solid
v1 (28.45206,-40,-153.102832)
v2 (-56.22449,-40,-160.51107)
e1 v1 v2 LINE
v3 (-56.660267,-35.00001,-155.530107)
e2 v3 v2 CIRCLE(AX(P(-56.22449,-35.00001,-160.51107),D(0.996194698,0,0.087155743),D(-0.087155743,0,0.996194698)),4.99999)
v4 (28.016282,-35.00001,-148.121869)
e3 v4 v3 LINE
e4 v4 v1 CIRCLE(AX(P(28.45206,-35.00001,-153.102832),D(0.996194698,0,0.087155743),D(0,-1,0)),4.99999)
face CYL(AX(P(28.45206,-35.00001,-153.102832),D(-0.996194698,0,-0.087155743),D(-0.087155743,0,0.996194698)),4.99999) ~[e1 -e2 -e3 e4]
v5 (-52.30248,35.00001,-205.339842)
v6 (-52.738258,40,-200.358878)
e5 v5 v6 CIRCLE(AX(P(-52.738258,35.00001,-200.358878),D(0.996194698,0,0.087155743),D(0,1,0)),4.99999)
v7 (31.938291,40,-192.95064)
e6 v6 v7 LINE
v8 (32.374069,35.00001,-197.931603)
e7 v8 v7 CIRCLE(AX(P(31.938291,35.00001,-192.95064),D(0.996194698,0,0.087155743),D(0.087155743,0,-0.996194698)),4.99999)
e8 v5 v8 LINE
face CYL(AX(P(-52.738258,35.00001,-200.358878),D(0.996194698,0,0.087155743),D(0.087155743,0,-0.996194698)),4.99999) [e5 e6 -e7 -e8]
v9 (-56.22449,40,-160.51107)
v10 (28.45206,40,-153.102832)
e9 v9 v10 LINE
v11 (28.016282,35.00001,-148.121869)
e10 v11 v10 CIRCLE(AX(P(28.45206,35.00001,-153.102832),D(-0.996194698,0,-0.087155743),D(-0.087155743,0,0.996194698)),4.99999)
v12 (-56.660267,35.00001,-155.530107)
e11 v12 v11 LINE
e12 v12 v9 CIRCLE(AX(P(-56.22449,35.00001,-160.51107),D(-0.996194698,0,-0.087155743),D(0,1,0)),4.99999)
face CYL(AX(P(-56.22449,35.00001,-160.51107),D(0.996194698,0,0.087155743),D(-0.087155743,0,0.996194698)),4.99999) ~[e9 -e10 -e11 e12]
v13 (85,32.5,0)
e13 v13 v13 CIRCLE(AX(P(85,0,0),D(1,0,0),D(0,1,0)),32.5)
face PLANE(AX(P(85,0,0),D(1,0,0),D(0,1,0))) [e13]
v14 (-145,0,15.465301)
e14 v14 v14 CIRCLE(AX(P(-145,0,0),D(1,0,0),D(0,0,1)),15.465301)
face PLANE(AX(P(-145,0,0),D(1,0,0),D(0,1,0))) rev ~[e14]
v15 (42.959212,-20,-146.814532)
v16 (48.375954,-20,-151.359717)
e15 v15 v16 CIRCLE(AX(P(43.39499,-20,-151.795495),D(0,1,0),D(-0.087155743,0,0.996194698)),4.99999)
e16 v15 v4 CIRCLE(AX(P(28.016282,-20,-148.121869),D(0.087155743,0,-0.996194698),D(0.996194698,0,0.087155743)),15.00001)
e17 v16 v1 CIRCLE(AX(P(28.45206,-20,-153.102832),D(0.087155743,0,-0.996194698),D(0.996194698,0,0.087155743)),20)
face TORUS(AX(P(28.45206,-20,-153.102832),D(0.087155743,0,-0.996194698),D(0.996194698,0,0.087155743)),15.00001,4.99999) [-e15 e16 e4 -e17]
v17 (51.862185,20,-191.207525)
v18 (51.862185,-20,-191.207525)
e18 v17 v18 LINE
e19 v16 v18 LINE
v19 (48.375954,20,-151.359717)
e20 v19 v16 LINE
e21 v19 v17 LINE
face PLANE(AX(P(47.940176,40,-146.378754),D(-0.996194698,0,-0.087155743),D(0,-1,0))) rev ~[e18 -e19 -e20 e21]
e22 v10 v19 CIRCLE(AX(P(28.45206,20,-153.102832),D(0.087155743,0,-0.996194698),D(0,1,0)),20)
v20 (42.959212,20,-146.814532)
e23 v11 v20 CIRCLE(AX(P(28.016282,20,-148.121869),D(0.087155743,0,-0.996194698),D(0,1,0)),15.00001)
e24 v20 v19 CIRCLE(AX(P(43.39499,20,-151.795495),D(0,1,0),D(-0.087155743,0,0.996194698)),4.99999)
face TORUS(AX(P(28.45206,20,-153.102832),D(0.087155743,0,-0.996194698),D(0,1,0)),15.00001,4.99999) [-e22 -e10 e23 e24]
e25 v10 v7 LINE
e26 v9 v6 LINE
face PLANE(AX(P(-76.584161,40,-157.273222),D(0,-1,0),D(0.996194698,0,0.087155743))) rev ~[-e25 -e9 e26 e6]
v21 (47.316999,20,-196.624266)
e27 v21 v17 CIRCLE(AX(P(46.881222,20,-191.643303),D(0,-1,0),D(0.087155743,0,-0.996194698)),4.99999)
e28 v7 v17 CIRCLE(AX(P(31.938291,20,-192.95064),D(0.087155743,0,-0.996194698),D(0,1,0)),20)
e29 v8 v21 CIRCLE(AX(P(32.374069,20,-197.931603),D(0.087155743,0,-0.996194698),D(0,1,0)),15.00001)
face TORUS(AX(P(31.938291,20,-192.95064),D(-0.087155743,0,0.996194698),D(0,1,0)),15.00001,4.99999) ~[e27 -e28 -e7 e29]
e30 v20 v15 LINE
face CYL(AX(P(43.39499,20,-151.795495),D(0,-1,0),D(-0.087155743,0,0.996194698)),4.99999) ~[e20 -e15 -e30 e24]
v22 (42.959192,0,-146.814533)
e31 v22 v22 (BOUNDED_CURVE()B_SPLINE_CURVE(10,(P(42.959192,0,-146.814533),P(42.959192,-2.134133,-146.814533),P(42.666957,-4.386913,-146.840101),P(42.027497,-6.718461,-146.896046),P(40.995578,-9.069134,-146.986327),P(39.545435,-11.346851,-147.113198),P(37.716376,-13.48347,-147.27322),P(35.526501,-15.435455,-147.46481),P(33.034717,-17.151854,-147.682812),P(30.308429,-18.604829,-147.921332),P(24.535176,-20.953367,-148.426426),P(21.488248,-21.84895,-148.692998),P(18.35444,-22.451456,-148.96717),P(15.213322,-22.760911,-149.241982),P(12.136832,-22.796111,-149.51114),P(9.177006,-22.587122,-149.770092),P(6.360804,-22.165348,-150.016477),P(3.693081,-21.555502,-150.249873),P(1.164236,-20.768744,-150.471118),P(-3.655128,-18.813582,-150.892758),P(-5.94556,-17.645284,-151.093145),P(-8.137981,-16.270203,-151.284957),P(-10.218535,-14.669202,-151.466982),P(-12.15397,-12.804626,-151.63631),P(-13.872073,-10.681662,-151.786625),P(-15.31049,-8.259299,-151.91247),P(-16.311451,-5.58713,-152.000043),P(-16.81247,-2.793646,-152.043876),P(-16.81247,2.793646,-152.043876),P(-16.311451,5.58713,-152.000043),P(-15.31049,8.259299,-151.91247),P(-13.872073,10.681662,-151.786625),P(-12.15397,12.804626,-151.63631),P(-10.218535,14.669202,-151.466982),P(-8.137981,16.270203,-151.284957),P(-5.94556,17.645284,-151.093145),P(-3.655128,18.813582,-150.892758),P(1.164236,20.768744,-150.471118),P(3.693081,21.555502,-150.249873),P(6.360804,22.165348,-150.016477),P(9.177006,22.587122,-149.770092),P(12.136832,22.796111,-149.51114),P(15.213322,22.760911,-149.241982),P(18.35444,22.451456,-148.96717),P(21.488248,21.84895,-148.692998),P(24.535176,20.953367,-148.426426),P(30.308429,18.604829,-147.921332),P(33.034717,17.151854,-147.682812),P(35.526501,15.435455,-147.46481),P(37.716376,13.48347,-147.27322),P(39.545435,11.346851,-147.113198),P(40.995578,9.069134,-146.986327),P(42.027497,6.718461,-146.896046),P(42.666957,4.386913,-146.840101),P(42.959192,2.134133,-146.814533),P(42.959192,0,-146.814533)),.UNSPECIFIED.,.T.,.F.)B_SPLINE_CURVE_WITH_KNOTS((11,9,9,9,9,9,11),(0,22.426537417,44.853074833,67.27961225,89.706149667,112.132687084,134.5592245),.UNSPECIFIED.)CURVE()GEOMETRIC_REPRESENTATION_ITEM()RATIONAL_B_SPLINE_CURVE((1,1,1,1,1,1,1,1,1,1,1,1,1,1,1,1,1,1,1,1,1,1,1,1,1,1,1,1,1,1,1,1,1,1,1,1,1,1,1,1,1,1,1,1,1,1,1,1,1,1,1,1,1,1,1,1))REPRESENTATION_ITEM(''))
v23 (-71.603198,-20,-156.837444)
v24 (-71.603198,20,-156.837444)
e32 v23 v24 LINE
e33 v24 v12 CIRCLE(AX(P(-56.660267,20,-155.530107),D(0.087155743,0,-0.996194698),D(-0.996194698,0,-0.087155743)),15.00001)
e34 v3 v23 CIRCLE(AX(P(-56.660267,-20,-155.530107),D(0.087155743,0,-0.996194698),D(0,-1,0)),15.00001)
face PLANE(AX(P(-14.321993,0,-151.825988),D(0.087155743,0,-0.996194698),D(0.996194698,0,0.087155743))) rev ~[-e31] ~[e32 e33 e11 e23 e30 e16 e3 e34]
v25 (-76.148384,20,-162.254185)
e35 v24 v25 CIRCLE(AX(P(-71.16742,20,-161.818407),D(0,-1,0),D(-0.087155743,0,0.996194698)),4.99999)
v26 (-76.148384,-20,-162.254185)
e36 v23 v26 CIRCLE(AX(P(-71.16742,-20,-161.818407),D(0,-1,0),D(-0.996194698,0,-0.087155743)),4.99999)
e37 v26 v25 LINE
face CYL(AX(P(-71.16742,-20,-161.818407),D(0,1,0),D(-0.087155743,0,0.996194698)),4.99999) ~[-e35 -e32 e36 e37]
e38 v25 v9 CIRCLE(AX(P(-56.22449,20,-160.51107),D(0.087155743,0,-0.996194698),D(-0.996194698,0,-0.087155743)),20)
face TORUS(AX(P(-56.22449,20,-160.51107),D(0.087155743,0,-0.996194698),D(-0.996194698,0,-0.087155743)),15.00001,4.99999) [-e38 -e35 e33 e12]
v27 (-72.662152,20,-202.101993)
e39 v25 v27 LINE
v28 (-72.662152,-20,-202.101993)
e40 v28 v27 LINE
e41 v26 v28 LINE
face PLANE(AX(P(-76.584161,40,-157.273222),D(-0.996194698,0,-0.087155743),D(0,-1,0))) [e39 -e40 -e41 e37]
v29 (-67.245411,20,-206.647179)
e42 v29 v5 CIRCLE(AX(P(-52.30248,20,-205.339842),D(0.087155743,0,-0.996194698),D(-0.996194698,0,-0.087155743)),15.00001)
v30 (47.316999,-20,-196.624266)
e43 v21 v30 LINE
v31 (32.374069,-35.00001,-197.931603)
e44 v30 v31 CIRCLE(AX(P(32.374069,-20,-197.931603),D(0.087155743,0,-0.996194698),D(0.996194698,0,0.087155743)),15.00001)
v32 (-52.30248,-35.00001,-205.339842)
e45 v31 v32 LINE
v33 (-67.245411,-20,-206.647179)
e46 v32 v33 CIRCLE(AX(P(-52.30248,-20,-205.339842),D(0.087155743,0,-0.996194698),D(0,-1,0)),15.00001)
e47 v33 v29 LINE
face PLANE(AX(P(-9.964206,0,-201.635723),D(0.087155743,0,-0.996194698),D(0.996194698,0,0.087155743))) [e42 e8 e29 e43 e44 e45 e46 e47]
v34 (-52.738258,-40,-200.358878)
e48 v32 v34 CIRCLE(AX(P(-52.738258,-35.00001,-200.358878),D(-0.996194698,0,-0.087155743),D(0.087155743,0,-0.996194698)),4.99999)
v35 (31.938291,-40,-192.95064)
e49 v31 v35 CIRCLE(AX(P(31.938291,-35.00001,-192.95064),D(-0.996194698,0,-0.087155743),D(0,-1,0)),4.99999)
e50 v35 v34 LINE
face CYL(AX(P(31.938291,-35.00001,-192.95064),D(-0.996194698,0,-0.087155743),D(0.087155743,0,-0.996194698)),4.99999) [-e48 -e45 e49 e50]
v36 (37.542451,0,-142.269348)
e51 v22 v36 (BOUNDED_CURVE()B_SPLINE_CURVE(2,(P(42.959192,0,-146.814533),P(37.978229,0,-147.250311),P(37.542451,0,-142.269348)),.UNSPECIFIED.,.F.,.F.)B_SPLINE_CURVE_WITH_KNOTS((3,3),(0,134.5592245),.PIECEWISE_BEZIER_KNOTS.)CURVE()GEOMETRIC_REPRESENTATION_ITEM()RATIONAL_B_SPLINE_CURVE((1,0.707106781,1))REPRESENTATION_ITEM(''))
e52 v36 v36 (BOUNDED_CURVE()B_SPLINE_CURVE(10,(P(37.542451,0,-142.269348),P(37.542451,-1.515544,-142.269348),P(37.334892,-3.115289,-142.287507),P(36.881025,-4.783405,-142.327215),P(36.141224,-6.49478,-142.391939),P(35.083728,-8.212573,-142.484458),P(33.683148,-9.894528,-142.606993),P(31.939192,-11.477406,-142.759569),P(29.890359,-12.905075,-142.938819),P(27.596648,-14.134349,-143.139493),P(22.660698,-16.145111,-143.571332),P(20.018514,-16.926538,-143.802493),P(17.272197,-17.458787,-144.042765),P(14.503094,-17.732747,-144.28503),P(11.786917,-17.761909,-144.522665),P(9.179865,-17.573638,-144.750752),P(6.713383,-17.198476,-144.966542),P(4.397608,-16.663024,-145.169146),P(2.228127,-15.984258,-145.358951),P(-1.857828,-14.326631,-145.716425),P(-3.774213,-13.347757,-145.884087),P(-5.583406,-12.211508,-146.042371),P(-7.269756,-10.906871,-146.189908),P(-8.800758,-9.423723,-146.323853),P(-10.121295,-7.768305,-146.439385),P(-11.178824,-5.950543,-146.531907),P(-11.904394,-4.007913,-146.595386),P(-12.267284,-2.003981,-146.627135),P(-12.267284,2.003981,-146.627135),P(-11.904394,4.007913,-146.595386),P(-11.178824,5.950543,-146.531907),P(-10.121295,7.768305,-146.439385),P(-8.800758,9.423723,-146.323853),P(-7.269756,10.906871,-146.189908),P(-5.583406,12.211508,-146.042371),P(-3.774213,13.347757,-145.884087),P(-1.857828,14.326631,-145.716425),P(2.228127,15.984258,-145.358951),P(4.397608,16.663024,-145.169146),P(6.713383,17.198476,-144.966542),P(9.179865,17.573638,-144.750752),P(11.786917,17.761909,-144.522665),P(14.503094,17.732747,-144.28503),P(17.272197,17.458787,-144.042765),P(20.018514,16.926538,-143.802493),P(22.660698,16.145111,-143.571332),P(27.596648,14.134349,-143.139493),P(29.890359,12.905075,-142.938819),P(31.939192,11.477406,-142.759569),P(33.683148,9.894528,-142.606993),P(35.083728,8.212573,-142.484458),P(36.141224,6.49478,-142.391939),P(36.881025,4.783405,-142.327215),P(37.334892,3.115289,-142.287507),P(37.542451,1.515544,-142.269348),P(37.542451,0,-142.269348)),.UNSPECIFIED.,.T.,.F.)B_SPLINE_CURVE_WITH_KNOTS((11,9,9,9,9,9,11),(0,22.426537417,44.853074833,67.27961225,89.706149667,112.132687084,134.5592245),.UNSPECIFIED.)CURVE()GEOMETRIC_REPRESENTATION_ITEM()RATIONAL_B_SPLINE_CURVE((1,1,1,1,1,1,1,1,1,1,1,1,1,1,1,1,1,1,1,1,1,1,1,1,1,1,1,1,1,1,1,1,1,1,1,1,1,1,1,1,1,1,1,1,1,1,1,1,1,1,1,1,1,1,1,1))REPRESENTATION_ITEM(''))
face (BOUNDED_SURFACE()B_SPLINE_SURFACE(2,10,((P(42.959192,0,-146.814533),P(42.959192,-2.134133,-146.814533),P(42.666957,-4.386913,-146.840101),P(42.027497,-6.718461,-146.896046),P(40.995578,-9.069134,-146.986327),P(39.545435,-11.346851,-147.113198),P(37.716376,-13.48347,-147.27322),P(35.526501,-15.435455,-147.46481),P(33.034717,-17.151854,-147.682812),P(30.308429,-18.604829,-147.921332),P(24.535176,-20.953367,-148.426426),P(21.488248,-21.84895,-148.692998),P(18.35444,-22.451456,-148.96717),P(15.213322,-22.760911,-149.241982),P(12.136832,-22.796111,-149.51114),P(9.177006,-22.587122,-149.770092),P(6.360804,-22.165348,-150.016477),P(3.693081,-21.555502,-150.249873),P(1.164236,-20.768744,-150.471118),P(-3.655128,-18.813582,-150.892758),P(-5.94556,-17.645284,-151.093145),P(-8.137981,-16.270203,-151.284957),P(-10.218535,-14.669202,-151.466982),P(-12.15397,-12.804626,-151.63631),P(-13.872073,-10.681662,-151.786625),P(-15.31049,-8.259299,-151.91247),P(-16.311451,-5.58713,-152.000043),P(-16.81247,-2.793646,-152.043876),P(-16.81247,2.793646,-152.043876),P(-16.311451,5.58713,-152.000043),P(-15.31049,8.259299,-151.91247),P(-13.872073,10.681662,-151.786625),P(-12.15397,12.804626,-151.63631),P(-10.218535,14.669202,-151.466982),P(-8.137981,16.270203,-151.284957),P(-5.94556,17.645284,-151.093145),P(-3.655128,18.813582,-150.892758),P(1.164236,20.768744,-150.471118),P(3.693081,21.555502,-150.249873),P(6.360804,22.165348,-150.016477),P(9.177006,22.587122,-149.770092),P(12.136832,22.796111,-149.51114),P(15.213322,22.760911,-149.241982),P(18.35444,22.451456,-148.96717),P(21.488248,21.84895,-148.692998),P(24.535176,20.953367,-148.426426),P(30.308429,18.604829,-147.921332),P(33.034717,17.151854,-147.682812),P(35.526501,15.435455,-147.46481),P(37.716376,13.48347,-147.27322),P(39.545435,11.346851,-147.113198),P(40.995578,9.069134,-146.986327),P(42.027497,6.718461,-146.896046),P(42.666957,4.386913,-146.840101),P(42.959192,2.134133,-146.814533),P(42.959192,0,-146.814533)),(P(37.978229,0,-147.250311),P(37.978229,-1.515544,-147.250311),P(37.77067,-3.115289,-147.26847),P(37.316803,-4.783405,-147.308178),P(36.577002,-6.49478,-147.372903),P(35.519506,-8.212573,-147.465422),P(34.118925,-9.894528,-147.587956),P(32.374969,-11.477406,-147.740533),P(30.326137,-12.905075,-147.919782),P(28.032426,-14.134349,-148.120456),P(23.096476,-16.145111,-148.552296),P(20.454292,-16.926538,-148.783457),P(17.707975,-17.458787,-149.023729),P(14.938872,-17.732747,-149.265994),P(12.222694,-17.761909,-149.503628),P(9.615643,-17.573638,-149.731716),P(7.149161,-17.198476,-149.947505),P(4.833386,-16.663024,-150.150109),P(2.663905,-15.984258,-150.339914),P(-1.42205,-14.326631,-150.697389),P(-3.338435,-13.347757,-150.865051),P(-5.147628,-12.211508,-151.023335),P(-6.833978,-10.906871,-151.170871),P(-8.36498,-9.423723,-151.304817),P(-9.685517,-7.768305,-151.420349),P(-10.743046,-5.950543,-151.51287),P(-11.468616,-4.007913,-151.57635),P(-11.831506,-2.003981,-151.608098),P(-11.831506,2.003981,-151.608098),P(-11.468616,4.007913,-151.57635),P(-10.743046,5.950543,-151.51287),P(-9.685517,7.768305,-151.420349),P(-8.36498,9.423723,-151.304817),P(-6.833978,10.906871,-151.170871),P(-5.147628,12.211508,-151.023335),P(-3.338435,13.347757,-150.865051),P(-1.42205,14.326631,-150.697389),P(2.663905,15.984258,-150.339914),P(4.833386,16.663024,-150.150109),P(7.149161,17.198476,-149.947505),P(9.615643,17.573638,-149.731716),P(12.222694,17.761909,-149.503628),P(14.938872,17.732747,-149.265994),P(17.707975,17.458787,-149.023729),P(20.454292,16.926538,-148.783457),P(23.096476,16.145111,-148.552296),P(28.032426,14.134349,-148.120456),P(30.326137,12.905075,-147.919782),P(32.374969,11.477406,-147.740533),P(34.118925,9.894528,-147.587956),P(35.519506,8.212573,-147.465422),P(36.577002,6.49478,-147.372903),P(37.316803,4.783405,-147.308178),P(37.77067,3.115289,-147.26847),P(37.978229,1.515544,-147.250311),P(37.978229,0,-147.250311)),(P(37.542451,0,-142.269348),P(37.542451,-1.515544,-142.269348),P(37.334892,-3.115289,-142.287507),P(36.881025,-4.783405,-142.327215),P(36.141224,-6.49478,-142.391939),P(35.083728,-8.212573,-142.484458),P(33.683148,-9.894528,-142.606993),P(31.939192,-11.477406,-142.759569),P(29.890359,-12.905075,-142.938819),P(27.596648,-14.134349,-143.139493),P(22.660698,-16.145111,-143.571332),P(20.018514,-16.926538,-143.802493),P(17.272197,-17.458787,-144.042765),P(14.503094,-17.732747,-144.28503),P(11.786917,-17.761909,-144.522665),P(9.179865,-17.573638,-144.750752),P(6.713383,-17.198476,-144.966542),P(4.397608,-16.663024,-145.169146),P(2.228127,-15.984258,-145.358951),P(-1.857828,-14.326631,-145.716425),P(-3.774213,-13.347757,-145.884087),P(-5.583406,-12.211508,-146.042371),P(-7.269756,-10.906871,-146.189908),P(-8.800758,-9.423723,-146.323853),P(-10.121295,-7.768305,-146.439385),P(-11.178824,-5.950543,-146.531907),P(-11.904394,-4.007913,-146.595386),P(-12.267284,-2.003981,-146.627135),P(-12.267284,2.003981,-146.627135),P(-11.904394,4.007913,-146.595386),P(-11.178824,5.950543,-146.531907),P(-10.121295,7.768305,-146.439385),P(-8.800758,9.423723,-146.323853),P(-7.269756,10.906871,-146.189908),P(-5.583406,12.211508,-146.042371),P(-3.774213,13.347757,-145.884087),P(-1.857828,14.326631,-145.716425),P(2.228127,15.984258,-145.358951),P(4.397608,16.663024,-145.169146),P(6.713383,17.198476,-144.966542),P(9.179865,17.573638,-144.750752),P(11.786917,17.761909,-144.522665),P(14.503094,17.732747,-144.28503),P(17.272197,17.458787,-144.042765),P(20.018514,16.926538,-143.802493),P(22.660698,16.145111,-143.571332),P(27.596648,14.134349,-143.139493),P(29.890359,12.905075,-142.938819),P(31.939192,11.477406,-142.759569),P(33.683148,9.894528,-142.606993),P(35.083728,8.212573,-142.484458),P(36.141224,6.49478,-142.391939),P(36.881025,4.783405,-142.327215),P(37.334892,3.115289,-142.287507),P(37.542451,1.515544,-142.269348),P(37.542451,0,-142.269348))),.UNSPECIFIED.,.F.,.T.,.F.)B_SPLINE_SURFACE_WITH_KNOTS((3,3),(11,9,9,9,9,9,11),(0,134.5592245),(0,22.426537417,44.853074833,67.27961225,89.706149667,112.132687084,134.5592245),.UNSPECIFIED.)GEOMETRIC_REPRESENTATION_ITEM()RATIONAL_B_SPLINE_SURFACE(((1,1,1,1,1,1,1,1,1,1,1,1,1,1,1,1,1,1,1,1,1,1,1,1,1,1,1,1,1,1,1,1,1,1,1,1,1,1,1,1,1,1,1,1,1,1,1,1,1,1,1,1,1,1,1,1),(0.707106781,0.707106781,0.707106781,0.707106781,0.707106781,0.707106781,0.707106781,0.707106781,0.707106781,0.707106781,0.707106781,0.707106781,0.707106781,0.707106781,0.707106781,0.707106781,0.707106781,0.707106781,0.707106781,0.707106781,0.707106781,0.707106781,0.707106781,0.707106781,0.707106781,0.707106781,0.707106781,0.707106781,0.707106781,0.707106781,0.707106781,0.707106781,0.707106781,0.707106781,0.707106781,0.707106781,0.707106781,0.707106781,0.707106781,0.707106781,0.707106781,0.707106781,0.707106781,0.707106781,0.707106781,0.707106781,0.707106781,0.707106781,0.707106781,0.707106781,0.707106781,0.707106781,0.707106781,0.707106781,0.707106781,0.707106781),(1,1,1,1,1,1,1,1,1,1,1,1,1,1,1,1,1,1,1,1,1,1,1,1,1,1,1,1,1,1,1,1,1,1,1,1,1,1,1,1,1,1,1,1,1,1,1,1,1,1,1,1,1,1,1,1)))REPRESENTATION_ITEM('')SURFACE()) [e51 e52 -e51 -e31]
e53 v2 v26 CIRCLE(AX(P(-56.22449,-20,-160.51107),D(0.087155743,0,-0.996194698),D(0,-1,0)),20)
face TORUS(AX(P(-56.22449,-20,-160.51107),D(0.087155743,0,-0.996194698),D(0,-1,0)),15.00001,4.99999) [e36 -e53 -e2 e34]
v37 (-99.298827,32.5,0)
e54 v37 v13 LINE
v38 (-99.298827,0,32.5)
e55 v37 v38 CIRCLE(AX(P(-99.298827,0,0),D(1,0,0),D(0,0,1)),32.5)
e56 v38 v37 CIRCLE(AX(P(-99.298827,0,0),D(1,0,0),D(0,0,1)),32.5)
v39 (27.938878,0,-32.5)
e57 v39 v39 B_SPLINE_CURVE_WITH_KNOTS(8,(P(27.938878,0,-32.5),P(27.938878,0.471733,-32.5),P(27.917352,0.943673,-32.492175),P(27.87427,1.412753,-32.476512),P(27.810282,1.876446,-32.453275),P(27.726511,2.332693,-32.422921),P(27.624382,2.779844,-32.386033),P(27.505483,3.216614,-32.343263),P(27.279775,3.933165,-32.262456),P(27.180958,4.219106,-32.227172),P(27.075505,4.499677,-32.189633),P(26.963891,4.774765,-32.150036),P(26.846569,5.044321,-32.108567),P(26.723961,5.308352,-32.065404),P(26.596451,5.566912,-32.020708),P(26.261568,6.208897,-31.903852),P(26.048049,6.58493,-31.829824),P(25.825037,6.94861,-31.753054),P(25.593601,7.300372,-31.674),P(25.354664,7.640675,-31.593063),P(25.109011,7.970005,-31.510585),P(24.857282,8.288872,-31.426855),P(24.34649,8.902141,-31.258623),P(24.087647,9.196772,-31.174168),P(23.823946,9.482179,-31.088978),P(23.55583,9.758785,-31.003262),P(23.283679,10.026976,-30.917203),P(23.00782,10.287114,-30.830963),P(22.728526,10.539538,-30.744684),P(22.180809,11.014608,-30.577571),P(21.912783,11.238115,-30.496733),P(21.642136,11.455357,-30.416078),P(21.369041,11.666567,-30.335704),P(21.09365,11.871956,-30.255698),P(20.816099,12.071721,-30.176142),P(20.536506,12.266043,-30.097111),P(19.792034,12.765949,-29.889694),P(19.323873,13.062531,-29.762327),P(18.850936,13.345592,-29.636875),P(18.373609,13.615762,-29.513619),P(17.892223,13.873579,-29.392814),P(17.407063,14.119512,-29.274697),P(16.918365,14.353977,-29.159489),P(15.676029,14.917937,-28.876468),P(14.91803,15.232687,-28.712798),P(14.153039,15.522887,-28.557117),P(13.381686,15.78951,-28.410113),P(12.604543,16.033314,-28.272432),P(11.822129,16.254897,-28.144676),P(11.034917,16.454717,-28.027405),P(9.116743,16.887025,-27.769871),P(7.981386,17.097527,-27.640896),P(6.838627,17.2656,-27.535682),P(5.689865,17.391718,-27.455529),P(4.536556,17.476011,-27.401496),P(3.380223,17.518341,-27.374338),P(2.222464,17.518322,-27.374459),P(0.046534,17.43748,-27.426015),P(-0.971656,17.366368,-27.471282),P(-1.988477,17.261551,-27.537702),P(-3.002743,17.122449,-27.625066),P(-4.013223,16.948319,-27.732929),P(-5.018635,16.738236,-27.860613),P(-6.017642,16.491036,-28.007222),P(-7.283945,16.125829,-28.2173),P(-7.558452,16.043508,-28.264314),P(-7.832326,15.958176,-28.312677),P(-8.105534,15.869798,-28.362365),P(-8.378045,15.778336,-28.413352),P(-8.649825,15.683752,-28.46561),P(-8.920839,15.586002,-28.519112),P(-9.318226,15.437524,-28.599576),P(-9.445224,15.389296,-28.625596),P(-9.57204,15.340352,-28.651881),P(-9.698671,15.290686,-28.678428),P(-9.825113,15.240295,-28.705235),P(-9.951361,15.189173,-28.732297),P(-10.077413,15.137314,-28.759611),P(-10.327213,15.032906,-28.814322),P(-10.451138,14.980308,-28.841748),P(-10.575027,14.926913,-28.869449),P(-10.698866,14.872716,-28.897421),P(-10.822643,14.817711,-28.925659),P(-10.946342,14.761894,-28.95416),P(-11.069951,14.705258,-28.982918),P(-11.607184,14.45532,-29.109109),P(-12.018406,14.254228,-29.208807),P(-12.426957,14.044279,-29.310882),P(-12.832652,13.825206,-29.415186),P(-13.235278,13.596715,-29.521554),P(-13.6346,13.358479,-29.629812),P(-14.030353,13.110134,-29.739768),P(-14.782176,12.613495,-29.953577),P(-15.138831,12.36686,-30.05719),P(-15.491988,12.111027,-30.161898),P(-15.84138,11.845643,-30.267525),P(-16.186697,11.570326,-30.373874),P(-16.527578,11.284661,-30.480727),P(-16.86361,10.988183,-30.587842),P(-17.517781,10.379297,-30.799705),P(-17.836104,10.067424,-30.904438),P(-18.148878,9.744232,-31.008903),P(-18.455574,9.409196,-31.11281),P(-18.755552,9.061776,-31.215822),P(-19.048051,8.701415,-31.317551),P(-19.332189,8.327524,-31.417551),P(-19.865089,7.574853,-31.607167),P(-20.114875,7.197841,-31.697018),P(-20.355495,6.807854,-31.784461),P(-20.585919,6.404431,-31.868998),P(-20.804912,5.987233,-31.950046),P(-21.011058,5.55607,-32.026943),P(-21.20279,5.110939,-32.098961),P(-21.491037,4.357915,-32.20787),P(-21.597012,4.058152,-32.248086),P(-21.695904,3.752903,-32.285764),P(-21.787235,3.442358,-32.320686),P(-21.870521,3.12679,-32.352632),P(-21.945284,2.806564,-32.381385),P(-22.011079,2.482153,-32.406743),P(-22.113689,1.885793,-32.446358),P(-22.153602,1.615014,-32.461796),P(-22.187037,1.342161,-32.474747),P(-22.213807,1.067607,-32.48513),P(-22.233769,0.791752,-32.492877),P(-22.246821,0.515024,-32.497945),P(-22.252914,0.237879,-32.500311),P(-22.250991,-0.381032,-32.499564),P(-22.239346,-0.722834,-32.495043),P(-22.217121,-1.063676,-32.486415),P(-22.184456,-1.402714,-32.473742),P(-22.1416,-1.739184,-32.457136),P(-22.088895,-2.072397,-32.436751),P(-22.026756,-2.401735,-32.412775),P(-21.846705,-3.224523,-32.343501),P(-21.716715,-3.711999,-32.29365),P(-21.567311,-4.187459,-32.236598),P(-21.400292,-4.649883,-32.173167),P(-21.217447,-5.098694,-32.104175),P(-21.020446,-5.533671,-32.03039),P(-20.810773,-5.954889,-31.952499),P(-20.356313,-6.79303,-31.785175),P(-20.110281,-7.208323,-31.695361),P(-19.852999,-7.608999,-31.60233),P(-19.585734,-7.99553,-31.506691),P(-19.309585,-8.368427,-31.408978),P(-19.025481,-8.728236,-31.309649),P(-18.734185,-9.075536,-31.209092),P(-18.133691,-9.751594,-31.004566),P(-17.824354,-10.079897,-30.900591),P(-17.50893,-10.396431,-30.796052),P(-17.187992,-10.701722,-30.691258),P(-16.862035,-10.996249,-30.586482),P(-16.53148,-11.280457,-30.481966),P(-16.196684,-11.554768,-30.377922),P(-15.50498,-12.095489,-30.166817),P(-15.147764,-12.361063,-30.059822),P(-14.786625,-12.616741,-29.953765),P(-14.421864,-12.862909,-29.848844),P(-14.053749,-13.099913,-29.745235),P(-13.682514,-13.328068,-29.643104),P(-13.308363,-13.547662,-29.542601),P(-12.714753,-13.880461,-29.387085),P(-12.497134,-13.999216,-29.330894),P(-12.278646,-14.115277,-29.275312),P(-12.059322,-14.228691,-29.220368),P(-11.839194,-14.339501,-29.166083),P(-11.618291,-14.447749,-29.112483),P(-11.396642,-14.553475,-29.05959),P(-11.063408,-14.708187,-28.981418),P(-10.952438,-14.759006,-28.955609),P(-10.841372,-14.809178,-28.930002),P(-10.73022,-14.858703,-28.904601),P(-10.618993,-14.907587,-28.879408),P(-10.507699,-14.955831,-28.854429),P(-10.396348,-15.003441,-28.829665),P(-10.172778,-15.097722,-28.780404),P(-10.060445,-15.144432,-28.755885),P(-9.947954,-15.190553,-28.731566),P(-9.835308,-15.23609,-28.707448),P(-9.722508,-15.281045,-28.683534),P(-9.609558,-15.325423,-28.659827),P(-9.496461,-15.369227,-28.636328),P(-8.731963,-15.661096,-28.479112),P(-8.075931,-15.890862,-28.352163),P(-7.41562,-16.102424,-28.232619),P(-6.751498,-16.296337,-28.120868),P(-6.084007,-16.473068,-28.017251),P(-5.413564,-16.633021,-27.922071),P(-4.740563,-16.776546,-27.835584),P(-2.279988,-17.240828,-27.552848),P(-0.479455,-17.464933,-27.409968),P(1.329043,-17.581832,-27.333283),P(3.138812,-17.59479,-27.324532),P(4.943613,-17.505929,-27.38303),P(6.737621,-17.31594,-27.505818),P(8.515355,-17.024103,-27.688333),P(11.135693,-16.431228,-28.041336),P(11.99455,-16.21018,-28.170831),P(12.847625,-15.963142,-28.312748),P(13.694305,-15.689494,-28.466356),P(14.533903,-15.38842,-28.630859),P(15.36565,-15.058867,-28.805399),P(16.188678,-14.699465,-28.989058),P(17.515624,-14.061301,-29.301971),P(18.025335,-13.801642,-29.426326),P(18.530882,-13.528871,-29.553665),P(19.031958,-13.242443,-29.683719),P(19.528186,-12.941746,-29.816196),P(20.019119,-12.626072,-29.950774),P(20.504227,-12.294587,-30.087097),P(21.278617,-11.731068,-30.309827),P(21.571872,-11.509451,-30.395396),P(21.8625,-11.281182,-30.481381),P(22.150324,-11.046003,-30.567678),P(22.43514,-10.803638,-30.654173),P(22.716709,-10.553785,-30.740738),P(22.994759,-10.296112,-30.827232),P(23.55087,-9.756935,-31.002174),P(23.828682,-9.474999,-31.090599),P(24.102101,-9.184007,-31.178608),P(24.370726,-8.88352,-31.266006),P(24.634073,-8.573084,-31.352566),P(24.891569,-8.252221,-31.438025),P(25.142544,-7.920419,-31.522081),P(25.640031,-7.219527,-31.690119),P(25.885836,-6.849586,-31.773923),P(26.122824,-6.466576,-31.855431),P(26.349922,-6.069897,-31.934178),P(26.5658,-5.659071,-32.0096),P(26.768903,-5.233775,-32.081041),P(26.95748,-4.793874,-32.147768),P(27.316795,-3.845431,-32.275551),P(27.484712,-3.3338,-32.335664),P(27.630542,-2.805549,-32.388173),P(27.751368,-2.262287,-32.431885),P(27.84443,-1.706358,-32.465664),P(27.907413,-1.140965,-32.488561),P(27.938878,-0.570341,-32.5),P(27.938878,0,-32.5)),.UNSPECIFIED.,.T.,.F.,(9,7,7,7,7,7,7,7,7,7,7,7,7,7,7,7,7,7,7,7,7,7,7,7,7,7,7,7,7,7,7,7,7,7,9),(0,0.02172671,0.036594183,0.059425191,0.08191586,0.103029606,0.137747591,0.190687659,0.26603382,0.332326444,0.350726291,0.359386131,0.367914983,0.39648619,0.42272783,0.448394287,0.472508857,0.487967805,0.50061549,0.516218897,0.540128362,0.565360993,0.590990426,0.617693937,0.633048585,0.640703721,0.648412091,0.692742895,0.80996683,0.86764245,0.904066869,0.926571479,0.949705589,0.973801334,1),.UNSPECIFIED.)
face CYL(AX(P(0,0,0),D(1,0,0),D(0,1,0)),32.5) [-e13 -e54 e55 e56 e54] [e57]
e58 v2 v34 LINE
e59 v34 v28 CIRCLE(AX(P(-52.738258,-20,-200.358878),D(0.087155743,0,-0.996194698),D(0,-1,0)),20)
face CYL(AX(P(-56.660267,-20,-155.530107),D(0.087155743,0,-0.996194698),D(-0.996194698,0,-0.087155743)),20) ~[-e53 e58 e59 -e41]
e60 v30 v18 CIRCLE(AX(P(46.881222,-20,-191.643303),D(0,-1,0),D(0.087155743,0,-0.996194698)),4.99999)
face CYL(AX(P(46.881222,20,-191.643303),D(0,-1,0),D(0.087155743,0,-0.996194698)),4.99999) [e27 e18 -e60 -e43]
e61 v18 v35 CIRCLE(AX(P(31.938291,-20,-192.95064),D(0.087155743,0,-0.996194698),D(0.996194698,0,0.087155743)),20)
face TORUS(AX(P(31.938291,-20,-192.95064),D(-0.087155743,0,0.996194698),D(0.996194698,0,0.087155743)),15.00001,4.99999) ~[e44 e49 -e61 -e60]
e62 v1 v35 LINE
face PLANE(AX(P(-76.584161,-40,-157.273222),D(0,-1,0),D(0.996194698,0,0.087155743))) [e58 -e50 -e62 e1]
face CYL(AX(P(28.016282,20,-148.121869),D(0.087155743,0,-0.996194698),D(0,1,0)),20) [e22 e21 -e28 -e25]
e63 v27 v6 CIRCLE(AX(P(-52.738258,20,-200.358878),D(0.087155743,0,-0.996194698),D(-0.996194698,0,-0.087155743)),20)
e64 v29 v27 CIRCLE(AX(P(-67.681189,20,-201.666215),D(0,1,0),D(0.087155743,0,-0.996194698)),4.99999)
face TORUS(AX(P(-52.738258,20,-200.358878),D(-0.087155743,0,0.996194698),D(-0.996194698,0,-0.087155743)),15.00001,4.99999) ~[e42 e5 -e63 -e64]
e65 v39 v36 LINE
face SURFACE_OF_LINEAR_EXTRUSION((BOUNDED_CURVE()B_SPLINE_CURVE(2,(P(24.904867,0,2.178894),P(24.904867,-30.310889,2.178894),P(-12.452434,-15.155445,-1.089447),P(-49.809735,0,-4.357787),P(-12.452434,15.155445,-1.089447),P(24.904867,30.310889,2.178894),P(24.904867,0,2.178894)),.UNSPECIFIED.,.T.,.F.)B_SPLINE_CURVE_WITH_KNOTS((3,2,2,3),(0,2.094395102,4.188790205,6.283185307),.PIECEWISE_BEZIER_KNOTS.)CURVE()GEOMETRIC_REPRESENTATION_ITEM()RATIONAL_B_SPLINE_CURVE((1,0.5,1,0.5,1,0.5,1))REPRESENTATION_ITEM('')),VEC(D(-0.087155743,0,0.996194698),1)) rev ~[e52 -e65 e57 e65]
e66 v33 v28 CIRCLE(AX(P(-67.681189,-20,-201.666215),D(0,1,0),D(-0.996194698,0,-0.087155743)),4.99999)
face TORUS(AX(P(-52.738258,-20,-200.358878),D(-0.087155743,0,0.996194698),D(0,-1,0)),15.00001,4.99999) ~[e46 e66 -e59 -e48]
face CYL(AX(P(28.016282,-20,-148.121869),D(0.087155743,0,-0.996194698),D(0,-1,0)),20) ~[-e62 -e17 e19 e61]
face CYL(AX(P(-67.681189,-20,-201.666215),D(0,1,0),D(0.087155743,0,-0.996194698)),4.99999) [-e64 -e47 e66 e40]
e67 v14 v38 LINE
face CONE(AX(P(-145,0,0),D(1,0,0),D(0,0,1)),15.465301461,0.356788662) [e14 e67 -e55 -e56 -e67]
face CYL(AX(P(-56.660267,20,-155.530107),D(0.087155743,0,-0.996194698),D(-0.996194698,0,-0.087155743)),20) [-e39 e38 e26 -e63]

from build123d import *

# Parameters (mm, degrees)
F0_R          = 32.5
F1_DEPTH      = 85
F1_DEPTH_BACK = 145
F5_DEPTH      = 150
F7_W          = 125
F7_H          = 80
F8_DEPTH      = 50
F11_R         = 20
F12_R         = 4.99999


# Not quite as in the source:
# - a fillet or chamfer is up to 0.001 mm smaller than in the source, because OpenCascade refuses the exact size


with BuildPart() as f1:
    # F0 (on Right) → F1 (new body, two sides)
    with BuildSketch(Plane.YZ) as f1_sk:
        Circle(F0_R)
    extrude(amount=F1_DEPTH)
    extrude(f1_sk.sketch, amount=-F1_DEPTH_BACK)

    # F4 (on line) → F5 (join)
    with BuildSketch(Plane(origin=(0, 0, 0), x_dir=(0.9961946981, 0, 0.0871557427), z_dir=(0.0871557427, 0, -0.9961946981))):
        with BuildLine():
            add(Edge.make_bspline(
                [(25, 0), (25, 30.3108891325), (-12.5, 15.1554445662), (-50, 0), (-12.5, -15.1554445662), (25, -30.3108891325), (25, 0)],
                knots=[0, 0, 0, 2.0943951024, 2.0943951024, 4.1887902048, 4.1887902048, 6.2831853072, 6.2831853072, 6.2831853072], degree=2, weights=[1, 0.5, 1, 0.5, 1, 0.5, 1]))
        make_face()
    extrude(amount=F5_DEPTH)

    # F7 (on offset) → F8 (join)
    with BuildSketch(Plane(origin=(13.0733614121, 0, -149.4292047138), x_dir=(0.9961946981, 0, 0.0871557427), z_dir=(0.0871557427, 0, -0.9961946981))):
        with Locations((-27.5, 0)):
            Rectangle(F7_W, F7_H)
    extrude(amount=F8_DEPTH)

    # F9 (on Front) → F10 (revolve, cut)
    with BuildSketch(Plane.XZ):
        Polygon((-145, 32.5), (-145, 15.4653014615), (-99.2988270521, 32.5), align=None)
    revolve(axis=Axis((-67.4336478114, 0, 0), (1, 0, 0)), mode=Mode.SUBTRACT)

    # F11
    f11_edges = [f1.edges().sort_by_distance(p)[0] for p in [
        (-74.405268, 40, -182.178089),
        (-74.405268, -40, -182.178089),
        (50.119069, -40, -171.283621),
        (50.119069, 40, -171.283621),
    ]]
    fillet(f11_edges, radius=F11_R)

    # F12 (radius 5 in the source; OpenCascade refuses exactly that, so slightly less here)
    f12_edges = [f1.edges().sort_by_distance(p)[0] for p in [
        (-11.831506, 0, -151.608098),
        (47.940176, 0, -146.378754),
        (42.104602, 34.142136, -146.8893),
        (42.104602, -34.142136, -146.8893),
        (-14.321993, 40, -151.825988),
        (-14.321993, -40, -151.825988),
        (-70.748588, 34.142136, -156.762675),
        (-70.748588, -34.142136, -156.762675),
        (-76.584161, 0, -157.273222),
        (52.297963, 0, -196.188489),
        (46.46239, 34.142136, -196.699035),
        (46.46239, -34.142136, -196.699035),
        (-9.964206, 40, -201.635723),
        (-9.964206, -40, -201.635723),
        (-66.390801, 34.142136, -206.57241),
        (-66.390801, -34.142136, -206.57241),
        (-72.226374, 0, -207.082956),
    ]]
    fillet(f12_edges, radius=F12_R)


solid = f1.part
